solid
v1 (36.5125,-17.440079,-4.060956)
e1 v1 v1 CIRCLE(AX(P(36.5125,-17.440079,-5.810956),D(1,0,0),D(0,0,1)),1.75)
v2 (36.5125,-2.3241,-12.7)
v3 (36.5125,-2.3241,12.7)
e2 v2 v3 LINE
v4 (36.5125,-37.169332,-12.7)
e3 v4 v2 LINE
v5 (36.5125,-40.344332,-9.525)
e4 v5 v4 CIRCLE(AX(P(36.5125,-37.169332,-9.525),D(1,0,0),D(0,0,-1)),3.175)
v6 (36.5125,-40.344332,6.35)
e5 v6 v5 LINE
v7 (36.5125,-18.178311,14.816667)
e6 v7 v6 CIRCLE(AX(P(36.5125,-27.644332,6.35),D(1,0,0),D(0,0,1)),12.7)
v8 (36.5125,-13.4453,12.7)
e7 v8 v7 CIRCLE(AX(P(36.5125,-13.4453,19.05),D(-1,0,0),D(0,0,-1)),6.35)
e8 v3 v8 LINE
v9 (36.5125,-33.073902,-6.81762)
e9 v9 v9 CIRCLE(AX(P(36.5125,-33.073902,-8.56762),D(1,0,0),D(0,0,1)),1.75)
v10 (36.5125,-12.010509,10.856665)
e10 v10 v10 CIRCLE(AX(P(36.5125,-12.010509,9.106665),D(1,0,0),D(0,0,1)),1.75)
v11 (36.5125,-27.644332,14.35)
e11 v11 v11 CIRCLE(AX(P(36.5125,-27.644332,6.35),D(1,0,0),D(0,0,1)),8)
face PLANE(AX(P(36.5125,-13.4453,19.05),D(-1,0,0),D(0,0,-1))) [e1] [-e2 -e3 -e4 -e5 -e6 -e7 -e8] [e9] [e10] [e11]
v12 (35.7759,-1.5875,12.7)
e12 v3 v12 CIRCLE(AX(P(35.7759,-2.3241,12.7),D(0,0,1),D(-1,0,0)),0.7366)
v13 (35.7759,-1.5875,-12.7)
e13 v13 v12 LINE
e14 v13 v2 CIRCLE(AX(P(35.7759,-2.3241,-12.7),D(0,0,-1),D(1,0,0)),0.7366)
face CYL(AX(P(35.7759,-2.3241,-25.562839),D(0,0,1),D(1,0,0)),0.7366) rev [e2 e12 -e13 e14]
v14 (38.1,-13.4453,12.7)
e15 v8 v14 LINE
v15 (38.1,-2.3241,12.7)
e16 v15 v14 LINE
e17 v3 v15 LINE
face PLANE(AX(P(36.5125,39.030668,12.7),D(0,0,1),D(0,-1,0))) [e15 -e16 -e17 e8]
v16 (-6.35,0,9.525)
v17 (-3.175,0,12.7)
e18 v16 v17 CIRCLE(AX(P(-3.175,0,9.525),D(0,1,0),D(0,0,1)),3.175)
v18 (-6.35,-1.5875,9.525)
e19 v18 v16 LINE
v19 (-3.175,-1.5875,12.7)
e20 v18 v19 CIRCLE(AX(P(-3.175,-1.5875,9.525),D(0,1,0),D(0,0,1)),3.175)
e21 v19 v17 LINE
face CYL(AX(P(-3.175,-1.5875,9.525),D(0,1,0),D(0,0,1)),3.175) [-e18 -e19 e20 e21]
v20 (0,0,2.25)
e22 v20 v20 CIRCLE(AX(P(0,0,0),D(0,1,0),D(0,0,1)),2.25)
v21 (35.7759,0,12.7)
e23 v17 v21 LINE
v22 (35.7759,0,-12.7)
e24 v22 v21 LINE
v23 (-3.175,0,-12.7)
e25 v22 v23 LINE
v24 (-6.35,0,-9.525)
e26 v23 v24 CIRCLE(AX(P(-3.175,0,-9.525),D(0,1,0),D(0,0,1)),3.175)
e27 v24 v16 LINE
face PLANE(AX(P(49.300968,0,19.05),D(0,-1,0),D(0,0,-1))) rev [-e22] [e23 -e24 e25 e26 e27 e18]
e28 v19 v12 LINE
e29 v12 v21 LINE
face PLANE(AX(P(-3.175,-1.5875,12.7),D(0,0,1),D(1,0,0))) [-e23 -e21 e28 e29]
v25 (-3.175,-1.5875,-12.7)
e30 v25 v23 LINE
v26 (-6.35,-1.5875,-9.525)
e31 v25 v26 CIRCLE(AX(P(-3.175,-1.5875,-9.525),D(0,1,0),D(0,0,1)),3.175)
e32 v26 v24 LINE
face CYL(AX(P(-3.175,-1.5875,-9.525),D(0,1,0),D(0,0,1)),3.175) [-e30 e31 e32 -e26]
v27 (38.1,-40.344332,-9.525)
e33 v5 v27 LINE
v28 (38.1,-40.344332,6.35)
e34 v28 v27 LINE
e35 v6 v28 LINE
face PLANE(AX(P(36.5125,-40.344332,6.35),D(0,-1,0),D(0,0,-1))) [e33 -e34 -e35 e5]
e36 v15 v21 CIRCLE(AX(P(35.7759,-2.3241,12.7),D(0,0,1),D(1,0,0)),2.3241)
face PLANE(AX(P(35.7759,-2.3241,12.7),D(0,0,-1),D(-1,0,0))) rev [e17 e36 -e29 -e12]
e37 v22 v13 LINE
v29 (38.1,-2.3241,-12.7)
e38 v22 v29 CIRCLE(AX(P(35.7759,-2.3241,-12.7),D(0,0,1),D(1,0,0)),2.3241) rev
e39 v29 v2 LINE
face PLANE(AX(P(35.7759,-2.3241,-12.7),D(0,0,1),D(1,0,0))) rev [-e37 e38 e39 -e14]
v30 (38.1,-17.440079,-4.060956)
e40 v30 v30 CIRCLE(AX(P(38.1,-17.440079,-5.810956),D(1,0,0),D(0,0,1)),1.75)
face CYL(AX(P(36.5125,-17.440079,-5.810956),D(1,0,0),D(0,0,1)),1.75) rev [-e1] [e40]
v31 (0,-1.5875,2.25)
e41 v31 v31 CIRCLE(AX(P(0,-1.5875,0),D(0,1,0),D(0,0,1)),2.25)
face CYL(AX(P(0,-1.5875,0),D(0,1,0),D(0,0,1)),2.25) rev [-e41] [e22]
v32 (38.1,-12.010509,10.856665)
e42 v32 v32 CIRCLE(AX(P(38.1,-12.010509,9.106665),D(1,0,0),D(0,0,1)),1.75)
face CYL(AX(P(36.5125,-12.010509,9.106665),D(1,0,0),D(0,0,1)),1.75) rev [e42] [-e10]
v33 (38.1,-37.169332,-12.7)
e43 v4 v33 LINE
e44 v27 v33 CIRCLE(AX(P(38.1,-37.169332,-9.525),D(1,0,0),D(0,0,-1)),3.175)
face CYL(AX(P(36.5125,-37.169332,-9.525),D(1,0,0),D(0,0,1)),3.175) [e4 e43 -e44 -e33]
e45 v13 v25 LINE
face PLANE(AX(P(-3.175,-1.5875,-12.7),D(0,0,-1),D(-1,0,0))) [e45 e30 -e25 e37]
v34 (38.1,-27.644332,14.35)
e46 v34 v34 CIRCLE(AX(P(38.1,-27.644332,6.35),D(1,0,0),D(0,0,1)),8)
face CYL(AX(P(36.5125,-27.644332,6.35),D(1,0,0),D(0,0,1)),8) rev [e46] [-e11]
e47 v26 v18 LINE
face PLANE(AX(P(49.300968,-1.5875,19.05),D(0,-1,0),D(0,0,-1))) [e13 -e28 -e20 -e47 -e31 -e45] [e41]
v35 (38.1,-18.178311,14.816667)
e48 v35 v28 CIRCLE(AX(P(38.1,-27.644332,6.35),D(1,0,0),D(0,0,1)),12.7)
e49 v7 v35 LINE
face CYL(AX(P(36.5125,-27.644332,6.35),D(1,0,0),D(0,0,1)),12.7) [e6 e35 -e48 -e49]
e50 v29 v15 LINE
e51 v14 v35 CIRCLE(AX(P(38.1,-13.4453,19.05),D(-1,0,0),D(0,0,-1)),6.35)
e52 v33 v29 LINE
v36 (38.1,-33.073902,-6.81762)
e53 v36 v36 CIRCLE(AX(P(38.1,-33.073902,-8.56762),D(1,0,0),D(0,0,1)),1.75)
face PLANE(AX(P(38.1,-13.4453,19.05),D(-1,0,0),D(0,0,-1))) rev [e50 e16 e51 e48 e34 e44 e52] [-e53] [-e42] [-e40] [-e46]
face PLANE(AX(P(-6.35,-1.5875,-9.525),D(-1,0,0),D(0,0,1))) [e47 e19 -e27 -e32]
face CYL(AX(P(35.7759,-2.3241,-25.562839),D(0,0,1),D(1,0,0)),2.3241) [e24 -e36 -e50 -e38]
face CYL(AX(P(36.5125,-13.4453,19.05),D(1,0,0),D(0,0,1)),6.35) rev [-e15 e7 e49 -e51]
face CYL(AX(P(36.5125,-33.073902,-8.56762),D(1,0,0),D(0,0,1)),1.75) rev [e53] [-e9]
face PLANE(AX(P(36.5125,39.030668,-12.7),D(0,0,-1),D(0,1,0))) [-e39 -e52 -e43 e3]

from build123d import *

# Parameters (mm, degrees)
SKETCH1_R                    = 2.25
SKETCH1_R_2                  = 8
SKETCH1_R_3                  = 1.75
BASE_FLANGE1_DEPTH           = 1.5875
SKETCHED_START               = 38.1
SKETCHED_BEND1_OUTLINE_W     = 1.5875
SKETCHED_BEND1_OUTLINE_H     = 25.4
SKETCHED_BEND1_DEPTH         = 38.1
SKETCHED_START_2             = 36.5125
SKETCHED_BEND1_2_OUTLINE_R   = 1.75
SKETCHED_BEND1_2_OUTLINE_R_2 = 8
SKETCHED_BEND1_2_DEPTH       = 1.361458034
SKETCHED_START_3             = 35.7759
SKETCHED_BEND1_3_OUTLINE_R   = 1.75
SKETCHED_BEND1_3_OUTLINE_R_2 = 8
SKETCHED_BEND1_3_DEPTH       = 2.3241
SKETCHED_START_4             = -12.7
SKETCHED_BEND1_4_DEPTH       = 31.75
SKETCHED_START_5             = -1.5875
SKETCHED_BEND1_5_DEPTH       = 1.5875


with BuildPart() as part:
    # Base-Flange1: sheet metal written as solids
    # Sketch1 → Base-Flange1 (new body)
    with BuildSketch(Plane(origin=(0, 0, 0), x_dir=(1, 0, 0), z_dir=(0, 1, 0))):
        with BuildLine():
            Line((-3.175, 12.7), (38.1, 12.7))
            Line((38.1, 12.7), (73.025, 12.7))
            ThreePointArc((73.025, 12.7), (75.27006403, 11.77006403), (76.2, 9.525))
            Line((76.2, 9.525), (76.2, -6.35))
            ThreePointArc((76.2, -6.35), (68.03164054, -18.213988959), (54.033978895, -14.816666667))
            ThreePointArc((54.033978895, -14.816666667), (51.893344987, -13.2532696), (49.300968343, -12.7))
            Line((49.300968343, -12.7), (38.1, -12.7))
            Line((38.1, -12.7), (-3.175, -12.7))
            ThreePointArc((-3.175, -12.7), (-5.42006403, -11.77006403), (-6.35, -9.525))
            Line((-6.35, -9.525), (-6.35, 9.525))
            ThreePointArc((-6.35, 9.525), (-5.42006403, 11.77006403), (-3.175, 12.7))
        make_face()
        with Locations(Location((0, 0, 0), (0, 0, 270))):
            Circle(SKETCH1_R, mode=Mode.SUBTRACT)
        with Locations(Location((63.5, -6.35, 0), (0, 0, 270))):
            Circle(SKETCH1_R_2, mode=Mode.SUBTRACT)
        with Locations(Location((47.866176921, -9.10666482, 0), (0, 0, 270))):
            Circle(SKETCH1_R_3, mode=Mode.SUBTRACT)
        with Locations(Location((53.295746696, 5.810955535, 0), (0, 0, 270))):
            Circle(SKETCH1_R_3, mode=Mode.SUBTRACT)
        with Locations(Location((68.929569775, 8.567620355, 0), (0, 0, 270))):
            Circle(SKETCH1_R_3, mode=Mode.SUBTRACT)
    extrude(amount=-BASE_FLANGE1_DEPTH)

    # Sketched Bend1: read off the stored shape, not the designer's step
    # Sketched Bend1 outline → Sketched Bend1 (cut)
    with BuildSketch(Plane.YZ.offset(SKETCHED_START)):
        with Locations((-0.79375, 0)):
            Rectangle(SKETCHED_BEND1_OUTLINE_W, SKETCHED_BEND1_OUTLINE_H)
    extrude(amount=SKETCHED_BEND1_DEPTH, mode=Mode.SUBTRACT)

    # Sketched Bend1 2 outline → Sketched Bend1 2 (add)
    with BuildSketch(Plane.YZ.offset(SKETCHED_START_2)):
        with BuildLine():
            Line((-1.5875, 12.7), (-13.445300184, 12.7))
            ThreePointArc((-13.445300184, 12.7), (-16.037676829, 13.2532696), (-18.178310737, 14.816666667))
            ThreePointArc((-18.178310737, 14.816666667), (-32.175972382, 18.213988959), (-40.344331841, 6.35))
            Line((-40.344331841, 6.35), (-40.344331841, -9.525))
            ThreePointArc((-40.344331841, -9.525), (-39.414395871, -11.77006403), (-37.169331841, -12.7))
            Line((-37.169331841, -12.7), (-1.5875, -12.7))
            Line((-1.5875, -12.7), (-1.5875, 12.7))
        make_face()
        with Locations((-33.073901617, -8.567620355)):
            Circle(SKETCHED_BEND1_2_OUTLINE_R, mode=Mode.SUBTRACT)
        with Locations((-17.440078538, -5.810955535)):
            Circle(SKETCHED_BEND1_2_OUTLINE_R, mode=Mode.SUBTRACT)
        with Locations((-27.644331841, 6.35)):
            Circle(SKETCHED_BEND1_2_OUTLINE_R_2, mode=Mode.SUBTRACT)
        with Locations((-12.010508762, 9.10666482)):
            Circle(SKETCHED_BEND1_2_OUTLINE_R, mode=Mode.SUBTRACT)
    extrude(amount=SKETCHED_BEND1_2_DEPTH)

    # Sketched Bend1 3 outline → Sketched Bend1 3 (add)
    with BuildSketch(Plane.YZ.offset(SKETCHED_START_3)):
        with BuildLine():
            Line((-1.5875, 12.7), (-13.445300184, 12.7))
            ThreePointArc((-13.445300184, 12.7), (-16.037676829, 13.2532696), (-18.178310737, 14.816666667))
            ThreePointArc((-18.178310737, 14.816666667), (-32.175972382, 18.213988959), (-40.344331841, 6.35))
            Line((-40.344331841, 6.35), (-40.344331841, -9.525))
            ThreePointArc((-40.344331841, -9.525), (-39.414395871, -11.77006403), (-37.169331841, -12.7))
            Line((-37.169331841, -12.7), (-1.5875, -12.7))
            Line((-1.5875, -12.7), (-1.5875, 12.7))
        make_face()
        with Locations((-33.073901617, -8.567620355)):
            Circle(SKETCHED_BEND1_3_OUTLINE_R, mode=Mode.SUBTRACT)
        with Locations((-17.440078538, -5.810955535)):
            Circle(SKETCHED_BEND1_3_OUTLINE_R, mode=Mode.SUBTRACT)
        with Locations((-27.644331841, 6.35)):
            Circle(SKETCHED_BEND1_3_OUTLINE_R_2, mode=Mode.SUBTRACT)
        with Locations((-12.010508762, 9.10666482)):
            Circle(SKETCHED_BEND1_3_OUTLINE_R, mode=Mode.SUBTRACT)
    extrude(amount=SKETCHED_BEND1_3_DEPTH)

    # Sketched Bend1 4 outline → Sketched Bend1 4 (cut)
    with BuildSketch(Plane.XY.offset(SKETCHED_START_4)):
        with BuildLine():
            ThreePointArc((35.7759, 0), (37.41928687, -0.68071313), (38.1, -2.3241))
            Line((38.1, -2.3241), (38.1, 0))
            Line((38.1, 0), (35.7759, 0))
        make_face()
        with BuildLine():
            Line((36.5125, -40.344331841), (36.5125, -2.3241))
            ThreePointArc((36.5125, -2.3241), (36.296754855, -1.803245145), (35.7759, -1.5875))
            Line((35.7759, -1.5875), (35.7759, -40.344331841))
            Line((35.7759, -40.344331841), (36.5125, -40.344331841))
        make_face()
    extrude(amount=SKETCHED_BEND1_4_DEPTH, mode=Mode.SUBTRACT)

    # Sketched Bend1 5 outline → Sketched Bend1 5 (cut)
    with BuildSketch(Plane(origin=(0, 0, 0), x_dir=(1, 0, 0), z_dir=(0, 1, 0)).offset(SKETCHED_START_5)):
        with BuildLine():
            ThreePointArc((49.300968343, -12.7), (51.893344987, -13.2532696), (54.033978895, -14.816666667))
            ThreePointArc((54.033978895, -14.816666667), (64.80660234, -18.982608215), (74.498522628, -12.7))
            Line((74.498522628, -12.7), (68.365953144, -12.7))
            ThreePointArc((68.365953144, -12.7), (63.5, -14.35), (58.634046856, -12.7))
            Line((58.634046856, -12.7), (49.300968343, -12.7))
        make_face()
    extrude(amount=SKETCHED_BEND1_5_DEPTH, mode=Mode.SUBTRACT)


solid = part.part
